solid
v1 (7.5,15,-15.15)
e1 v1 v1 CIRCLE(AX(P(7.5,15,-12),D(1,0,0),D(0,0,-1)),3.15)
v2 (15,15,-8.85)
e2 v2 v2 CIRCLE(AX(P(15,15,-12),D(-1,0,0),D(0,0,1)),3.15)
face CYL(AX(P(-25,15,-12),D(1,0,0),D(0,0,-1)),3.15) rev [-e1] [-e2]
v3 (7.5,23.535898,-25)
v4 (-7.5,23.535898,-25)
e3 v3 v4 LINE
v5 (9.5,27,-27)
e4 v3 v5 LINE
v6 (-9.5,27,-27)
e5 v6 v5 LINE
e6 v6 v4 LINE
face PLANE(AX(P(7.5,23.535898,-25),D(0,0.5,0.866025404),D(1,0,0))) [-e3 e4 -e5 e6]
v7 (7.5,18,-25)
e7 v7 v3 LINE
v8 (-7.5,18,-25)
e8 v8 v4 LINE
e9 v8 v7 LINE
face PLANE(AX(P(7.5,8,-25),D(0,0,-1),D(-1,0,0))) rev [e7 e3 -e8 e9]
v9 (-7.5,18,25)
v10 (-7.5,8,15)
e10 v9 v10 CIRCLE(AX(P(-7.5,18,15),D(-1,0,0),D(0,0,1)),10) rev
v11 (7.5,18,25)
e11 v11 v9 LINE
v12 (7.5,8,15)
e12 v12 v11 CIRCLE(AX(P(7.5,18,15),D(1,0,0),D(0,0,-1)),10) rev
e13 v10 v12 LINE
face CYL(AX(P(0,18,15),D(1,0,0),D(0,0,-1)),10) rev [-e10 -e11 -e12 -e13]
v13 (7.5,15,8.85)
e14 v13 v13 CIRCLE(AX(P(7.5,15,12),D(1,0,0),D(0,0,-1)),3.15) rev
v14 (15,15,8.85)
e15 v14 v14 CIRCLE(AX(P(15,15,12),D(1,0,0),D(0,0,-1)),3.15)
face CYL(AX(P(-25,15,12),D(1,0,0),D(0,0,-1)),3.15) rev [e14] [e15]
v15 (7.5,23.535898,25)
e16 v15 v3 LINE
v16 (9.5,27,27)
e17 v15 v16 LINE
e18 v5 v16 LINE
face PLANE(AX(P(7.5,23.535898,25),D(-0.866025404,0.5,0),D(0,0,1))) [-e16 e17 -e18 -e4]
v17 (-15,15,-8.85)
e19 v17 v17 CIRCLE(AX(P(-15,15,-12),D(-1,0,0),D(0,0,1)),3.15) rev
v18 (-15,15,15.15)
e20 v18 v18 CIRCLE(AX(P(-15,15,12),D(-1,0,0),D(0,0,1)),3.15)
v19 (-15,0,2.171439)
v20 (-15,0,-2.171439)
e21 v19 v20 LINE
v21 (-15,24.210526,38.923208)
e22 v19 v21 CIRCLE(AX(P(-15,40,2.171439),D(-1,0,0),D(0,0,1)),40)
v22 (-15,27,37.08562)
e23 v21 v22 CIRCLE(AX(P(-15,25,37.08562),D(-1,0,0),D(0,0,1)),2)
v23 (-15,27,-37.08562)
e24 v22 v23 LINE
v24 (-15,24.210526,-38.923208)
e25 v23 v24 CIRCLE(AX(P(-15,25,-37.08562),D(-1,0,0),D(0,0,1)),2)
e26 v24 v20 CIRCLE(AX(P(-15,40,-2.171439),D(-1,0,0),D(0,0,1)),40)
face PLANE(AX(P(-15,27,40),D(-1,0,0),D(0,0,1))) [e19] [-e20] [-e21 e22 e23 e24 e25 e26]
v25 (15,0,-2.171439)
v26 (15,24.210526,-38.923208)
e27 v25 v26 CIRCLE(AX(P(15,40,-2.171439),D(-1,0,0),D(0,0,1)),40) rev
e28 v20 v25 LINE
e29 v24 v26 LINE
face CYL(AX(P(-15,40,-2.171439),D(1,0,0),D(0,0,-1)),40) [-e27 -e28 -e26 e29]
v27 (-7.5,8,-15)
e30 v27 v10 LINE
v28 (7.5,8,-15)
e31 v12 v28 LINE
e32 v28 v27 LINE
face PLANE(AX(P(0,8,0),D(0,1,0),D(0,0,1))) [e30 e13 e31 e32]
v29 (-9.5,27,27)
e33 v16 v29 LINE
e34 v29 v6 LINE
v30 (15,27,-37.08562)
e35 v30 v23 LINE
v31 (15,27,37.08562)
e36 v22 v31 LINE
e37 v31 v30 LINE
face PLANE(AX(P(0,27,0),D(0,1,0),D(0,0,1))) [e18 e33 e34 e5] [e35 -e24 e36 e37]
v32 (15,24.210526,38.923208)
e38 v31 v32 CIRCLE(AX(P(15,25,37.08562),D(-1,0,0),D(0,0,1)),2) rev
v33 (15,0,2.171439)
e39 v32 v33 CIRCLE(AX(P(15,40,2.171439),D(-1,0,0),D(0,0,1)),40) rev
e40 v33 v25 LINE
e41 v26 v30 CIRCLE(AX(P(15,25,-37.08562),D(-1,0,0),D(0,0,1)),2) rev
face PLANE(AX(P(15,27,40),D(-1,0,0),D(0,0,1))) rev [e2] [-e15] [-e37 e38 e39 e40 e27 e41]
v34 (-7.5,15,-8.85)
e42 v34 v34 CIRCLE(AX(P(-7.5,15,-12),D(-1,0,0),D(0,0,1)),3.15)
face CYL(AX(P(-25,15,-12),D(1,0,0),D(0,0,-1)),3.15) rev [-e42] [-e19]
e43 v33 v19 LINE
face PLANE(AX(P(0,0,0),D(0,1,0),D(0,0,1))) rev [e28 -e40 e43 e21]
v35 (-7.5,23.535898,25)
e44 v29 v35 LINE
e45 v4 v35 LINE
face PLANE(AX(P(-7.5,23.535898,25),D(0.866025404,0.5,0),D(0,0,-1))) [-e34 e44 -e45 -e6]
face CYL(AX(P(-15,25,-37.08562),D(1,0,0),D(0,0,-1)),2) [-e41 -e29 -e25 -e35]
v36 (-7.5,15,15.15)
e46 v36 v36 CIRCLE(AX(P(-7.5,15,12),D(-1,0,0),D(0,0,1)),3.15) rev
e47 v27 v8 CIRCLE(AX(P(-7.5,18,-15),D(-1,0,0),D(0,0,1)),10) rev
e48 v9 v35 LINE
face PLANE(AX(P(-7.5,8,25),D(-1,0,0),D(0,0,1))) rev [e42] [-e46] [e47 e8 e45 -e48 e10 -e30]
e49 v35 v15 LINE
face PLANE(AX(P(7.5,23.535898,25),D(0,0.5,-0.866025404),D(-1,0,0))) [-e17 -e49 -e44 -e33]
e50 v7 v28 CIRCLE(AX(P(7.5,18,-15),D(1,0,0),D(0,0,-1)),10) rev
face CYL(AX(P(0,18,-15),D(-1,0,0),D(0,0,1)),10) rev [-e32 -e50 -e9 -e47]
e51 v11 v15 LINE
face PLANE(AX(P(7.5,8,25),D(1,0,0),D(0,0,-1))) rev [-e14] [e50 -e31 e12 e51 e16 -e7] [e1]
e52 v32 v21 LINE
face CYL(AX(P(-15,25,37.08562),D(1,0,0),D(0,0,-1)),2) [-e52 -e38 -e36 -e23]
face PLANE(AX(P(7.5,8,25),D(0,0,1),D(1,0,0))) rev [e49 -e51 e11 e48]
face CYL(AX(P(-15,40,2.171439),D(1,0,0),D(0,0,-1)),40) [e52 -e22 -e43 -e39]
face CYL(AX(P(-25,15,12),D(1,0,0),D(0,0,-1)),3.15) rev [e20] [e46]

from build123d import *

# Parameters (mm, degrees)
SKETCH1_W           = 30
SKETCH1_H           = 80
BOSS_EXTRUDE1_DEPTH = 27
SKETCH5_W           = 30
SKETCH5_H           = 10
BOSS_EXTRUDE2_DEPTH = 6
SKETCH2_R           = 3.15
CUT_EXTRUDE1_DEPTH  = 40
FILLET5_R           = 40
FILLET6_R           = 40
FILLET7_R           = 2
FILLET8_R           = 2
SKETCH6_W           = 10
SKETCH6_H           = 6
CUT_EXTRUDE2_DEPTH  = 60.301649892
SKETCH7_W           = 15
SKETCH7_H           = 50
CUT_EXTRUDE3_DEPTH  = 19
FILLET9_R           = 10
CHAMFER1_SIZE       = 2
CHAMFER1_SIZE2      = 3.464101615


with BuildPart() as part:
    # Sketch1 → Boss-Extrude1 (new body)
    with BuildSketch(Plane(origin=(0, 0, 0), x_dir=(1, 0, 0), z_dir=(0, 1, 0))):
        Rectangle(SKETCH1_W, SKETCH1_H)
    extrude(amount=BOSS_EXTRUDE1_DEPTH)

    # Sketch5 → Boss-Extrude2 (add)
    with BuildSketch(Plane(origin=(0, 27, 0), x_dir=(1, 0, 0), z_dir=(0, 1, 0))):
        Rectangle(SKETCH5_W, SKETCH5_H)
    extrude(amount=BOSS_EXTRUDE2_DEPTH)

    # Sketch2 → Cut-Extrude1 (cut)
    with BuildSketch(Plane(origin=(15, 0, 0), x_dir=(0, 0, -1), z_dir=(1, 0, 0))):
        with Locations((-12, 15)):
            Circle(SKETCH2_R)
        with Locations(Location((12, 15, 0), (0, 0, 180))):
            Circle(SKETCH2_R)
    extrude(amount=-CUT_EXTRUDE1_DEPTH, mode=Mode.SUBTRACT)

    # Fillet5
    # the kernel refuses this fillet: 40 mm, written as the material it takes off along each edge
    with BuildSketch(Plane(origin=(109.571401597, 0, -40), x_dir=(0, 0, 1), z_dir=(-1, 0, 0))) as fillet5_piece_1:
        with BuildLine():
            CenterArc((37.828560639, 40), FILLET5_R, 198.965574989, 71.034425011)
            Line((0, 27), (-0.756571213, 26.74))
            ThreePointArc((-0.756571213, 26.74), (-0.8, 13.5), (-0.8, 0))
            Line((-0.8, 0), (0, -0.8))
            Line((0, -0.8), (37.828560639, -0.8))
            Line((37.828560639, -0.8), (37.828560639, 0))
        make_face()
    extrude(amount=219.142803194, mode=Mode.SUBTRACT)

    # Fillet6
    # the kernel refuses this fillet: 40 mm, written as the material it takes off along each edge
    with BuildSketch(Plane(origin=(-109.571401597, 0, 40), x_dir=(0, 1, 0), z_dir=(1, 0, 0))) as fillet6_piece_1:
        with BuildLine():
            CenterArc((40, -37.828560639), FILLET6_R, 108.965574989, 71.034425011)
            Line((0, -37.828560639), (-0.8, -37.828560639))
            Line((-0.8, -37.828560639), (-0.8, 0))
            Line((-0.8, 0), (0, 0.8))
            ThreePointArc((0, 0.8), (13.5, 0.8), (26.74, 0.756571213))
            Line((26.74, 0.756571213), (27, 0))
        make_face()
    extrude(amount=219.142803194, mode=Mode.SUBTRACT)

    # Fillet7
    fillet7_edges = [part.edges().sort_by_distance(p)[0] for p in [
        (0, 27, -40),
    ]]
    fillet(fillet7_edges, radius=FILLET7_R)

    # Fillet8
    fillet8_edges = [part.edges().sort_by_distance(p)[0] for p in [
        (0, 27, 40),
    ]]
    fillet(fillet8_edges, radius=FILLET8_R)

    # Sketch6 → Cut-Extrude2 (cut, through all)
    with BuildSketch(Plane(origin=(15, 0, 0), x_dir=(0, 0, -1), z_dir=(1, 0, 0))):
        with Locations((0, 30)):
            Rectangle(SKETCH6_W, SKETCH6_H)
    extrude(amount=-CUT_EXTRUDE2_DEPTH, mode=Mode.SUBTRACT)

    # Sketch7 → Cut-Extrude3 (cut)
    with BuildSketch(Plane(origin=(0, 27, 0), x_dir=(1, 0, 0), z_dir=(0, 1, 0))):
        Rectangle(SKETCH7_W, SKETCH7_H)
    extrude(amount=-CUT_EXTRUDE3_DEPTH, mode=Mode.SUBTRACT)

    # Fillet9
    fillet9_edges = [part.edges().sort_by_distance(p)[0] for p in [
        (0, 8, -25),
        (0, 8, 25),
    ]]
    fillet(fillet9_edges, radius=FILLET9_R)

    # Chamfer1
    chamfer1_edges = [part.edges().sort_by_distance(p)[0] for p in [
        (-7.5, 27, 0),
        (0, 27, 25),
        (7.5, 27, 0),
        (0, 27, -25),
    ]]
    chamfer1_side = [part.faces().sort_by_distance(p)[0] for p in [
        (-14.199914204, 27, 0),
    ]]
    chamfer(chamfer1_edges, length=CHAMFER1_SIZE, length2=CHAMFER1_SIZE2, reference=chamfer1_side[0])


solid = part.part
